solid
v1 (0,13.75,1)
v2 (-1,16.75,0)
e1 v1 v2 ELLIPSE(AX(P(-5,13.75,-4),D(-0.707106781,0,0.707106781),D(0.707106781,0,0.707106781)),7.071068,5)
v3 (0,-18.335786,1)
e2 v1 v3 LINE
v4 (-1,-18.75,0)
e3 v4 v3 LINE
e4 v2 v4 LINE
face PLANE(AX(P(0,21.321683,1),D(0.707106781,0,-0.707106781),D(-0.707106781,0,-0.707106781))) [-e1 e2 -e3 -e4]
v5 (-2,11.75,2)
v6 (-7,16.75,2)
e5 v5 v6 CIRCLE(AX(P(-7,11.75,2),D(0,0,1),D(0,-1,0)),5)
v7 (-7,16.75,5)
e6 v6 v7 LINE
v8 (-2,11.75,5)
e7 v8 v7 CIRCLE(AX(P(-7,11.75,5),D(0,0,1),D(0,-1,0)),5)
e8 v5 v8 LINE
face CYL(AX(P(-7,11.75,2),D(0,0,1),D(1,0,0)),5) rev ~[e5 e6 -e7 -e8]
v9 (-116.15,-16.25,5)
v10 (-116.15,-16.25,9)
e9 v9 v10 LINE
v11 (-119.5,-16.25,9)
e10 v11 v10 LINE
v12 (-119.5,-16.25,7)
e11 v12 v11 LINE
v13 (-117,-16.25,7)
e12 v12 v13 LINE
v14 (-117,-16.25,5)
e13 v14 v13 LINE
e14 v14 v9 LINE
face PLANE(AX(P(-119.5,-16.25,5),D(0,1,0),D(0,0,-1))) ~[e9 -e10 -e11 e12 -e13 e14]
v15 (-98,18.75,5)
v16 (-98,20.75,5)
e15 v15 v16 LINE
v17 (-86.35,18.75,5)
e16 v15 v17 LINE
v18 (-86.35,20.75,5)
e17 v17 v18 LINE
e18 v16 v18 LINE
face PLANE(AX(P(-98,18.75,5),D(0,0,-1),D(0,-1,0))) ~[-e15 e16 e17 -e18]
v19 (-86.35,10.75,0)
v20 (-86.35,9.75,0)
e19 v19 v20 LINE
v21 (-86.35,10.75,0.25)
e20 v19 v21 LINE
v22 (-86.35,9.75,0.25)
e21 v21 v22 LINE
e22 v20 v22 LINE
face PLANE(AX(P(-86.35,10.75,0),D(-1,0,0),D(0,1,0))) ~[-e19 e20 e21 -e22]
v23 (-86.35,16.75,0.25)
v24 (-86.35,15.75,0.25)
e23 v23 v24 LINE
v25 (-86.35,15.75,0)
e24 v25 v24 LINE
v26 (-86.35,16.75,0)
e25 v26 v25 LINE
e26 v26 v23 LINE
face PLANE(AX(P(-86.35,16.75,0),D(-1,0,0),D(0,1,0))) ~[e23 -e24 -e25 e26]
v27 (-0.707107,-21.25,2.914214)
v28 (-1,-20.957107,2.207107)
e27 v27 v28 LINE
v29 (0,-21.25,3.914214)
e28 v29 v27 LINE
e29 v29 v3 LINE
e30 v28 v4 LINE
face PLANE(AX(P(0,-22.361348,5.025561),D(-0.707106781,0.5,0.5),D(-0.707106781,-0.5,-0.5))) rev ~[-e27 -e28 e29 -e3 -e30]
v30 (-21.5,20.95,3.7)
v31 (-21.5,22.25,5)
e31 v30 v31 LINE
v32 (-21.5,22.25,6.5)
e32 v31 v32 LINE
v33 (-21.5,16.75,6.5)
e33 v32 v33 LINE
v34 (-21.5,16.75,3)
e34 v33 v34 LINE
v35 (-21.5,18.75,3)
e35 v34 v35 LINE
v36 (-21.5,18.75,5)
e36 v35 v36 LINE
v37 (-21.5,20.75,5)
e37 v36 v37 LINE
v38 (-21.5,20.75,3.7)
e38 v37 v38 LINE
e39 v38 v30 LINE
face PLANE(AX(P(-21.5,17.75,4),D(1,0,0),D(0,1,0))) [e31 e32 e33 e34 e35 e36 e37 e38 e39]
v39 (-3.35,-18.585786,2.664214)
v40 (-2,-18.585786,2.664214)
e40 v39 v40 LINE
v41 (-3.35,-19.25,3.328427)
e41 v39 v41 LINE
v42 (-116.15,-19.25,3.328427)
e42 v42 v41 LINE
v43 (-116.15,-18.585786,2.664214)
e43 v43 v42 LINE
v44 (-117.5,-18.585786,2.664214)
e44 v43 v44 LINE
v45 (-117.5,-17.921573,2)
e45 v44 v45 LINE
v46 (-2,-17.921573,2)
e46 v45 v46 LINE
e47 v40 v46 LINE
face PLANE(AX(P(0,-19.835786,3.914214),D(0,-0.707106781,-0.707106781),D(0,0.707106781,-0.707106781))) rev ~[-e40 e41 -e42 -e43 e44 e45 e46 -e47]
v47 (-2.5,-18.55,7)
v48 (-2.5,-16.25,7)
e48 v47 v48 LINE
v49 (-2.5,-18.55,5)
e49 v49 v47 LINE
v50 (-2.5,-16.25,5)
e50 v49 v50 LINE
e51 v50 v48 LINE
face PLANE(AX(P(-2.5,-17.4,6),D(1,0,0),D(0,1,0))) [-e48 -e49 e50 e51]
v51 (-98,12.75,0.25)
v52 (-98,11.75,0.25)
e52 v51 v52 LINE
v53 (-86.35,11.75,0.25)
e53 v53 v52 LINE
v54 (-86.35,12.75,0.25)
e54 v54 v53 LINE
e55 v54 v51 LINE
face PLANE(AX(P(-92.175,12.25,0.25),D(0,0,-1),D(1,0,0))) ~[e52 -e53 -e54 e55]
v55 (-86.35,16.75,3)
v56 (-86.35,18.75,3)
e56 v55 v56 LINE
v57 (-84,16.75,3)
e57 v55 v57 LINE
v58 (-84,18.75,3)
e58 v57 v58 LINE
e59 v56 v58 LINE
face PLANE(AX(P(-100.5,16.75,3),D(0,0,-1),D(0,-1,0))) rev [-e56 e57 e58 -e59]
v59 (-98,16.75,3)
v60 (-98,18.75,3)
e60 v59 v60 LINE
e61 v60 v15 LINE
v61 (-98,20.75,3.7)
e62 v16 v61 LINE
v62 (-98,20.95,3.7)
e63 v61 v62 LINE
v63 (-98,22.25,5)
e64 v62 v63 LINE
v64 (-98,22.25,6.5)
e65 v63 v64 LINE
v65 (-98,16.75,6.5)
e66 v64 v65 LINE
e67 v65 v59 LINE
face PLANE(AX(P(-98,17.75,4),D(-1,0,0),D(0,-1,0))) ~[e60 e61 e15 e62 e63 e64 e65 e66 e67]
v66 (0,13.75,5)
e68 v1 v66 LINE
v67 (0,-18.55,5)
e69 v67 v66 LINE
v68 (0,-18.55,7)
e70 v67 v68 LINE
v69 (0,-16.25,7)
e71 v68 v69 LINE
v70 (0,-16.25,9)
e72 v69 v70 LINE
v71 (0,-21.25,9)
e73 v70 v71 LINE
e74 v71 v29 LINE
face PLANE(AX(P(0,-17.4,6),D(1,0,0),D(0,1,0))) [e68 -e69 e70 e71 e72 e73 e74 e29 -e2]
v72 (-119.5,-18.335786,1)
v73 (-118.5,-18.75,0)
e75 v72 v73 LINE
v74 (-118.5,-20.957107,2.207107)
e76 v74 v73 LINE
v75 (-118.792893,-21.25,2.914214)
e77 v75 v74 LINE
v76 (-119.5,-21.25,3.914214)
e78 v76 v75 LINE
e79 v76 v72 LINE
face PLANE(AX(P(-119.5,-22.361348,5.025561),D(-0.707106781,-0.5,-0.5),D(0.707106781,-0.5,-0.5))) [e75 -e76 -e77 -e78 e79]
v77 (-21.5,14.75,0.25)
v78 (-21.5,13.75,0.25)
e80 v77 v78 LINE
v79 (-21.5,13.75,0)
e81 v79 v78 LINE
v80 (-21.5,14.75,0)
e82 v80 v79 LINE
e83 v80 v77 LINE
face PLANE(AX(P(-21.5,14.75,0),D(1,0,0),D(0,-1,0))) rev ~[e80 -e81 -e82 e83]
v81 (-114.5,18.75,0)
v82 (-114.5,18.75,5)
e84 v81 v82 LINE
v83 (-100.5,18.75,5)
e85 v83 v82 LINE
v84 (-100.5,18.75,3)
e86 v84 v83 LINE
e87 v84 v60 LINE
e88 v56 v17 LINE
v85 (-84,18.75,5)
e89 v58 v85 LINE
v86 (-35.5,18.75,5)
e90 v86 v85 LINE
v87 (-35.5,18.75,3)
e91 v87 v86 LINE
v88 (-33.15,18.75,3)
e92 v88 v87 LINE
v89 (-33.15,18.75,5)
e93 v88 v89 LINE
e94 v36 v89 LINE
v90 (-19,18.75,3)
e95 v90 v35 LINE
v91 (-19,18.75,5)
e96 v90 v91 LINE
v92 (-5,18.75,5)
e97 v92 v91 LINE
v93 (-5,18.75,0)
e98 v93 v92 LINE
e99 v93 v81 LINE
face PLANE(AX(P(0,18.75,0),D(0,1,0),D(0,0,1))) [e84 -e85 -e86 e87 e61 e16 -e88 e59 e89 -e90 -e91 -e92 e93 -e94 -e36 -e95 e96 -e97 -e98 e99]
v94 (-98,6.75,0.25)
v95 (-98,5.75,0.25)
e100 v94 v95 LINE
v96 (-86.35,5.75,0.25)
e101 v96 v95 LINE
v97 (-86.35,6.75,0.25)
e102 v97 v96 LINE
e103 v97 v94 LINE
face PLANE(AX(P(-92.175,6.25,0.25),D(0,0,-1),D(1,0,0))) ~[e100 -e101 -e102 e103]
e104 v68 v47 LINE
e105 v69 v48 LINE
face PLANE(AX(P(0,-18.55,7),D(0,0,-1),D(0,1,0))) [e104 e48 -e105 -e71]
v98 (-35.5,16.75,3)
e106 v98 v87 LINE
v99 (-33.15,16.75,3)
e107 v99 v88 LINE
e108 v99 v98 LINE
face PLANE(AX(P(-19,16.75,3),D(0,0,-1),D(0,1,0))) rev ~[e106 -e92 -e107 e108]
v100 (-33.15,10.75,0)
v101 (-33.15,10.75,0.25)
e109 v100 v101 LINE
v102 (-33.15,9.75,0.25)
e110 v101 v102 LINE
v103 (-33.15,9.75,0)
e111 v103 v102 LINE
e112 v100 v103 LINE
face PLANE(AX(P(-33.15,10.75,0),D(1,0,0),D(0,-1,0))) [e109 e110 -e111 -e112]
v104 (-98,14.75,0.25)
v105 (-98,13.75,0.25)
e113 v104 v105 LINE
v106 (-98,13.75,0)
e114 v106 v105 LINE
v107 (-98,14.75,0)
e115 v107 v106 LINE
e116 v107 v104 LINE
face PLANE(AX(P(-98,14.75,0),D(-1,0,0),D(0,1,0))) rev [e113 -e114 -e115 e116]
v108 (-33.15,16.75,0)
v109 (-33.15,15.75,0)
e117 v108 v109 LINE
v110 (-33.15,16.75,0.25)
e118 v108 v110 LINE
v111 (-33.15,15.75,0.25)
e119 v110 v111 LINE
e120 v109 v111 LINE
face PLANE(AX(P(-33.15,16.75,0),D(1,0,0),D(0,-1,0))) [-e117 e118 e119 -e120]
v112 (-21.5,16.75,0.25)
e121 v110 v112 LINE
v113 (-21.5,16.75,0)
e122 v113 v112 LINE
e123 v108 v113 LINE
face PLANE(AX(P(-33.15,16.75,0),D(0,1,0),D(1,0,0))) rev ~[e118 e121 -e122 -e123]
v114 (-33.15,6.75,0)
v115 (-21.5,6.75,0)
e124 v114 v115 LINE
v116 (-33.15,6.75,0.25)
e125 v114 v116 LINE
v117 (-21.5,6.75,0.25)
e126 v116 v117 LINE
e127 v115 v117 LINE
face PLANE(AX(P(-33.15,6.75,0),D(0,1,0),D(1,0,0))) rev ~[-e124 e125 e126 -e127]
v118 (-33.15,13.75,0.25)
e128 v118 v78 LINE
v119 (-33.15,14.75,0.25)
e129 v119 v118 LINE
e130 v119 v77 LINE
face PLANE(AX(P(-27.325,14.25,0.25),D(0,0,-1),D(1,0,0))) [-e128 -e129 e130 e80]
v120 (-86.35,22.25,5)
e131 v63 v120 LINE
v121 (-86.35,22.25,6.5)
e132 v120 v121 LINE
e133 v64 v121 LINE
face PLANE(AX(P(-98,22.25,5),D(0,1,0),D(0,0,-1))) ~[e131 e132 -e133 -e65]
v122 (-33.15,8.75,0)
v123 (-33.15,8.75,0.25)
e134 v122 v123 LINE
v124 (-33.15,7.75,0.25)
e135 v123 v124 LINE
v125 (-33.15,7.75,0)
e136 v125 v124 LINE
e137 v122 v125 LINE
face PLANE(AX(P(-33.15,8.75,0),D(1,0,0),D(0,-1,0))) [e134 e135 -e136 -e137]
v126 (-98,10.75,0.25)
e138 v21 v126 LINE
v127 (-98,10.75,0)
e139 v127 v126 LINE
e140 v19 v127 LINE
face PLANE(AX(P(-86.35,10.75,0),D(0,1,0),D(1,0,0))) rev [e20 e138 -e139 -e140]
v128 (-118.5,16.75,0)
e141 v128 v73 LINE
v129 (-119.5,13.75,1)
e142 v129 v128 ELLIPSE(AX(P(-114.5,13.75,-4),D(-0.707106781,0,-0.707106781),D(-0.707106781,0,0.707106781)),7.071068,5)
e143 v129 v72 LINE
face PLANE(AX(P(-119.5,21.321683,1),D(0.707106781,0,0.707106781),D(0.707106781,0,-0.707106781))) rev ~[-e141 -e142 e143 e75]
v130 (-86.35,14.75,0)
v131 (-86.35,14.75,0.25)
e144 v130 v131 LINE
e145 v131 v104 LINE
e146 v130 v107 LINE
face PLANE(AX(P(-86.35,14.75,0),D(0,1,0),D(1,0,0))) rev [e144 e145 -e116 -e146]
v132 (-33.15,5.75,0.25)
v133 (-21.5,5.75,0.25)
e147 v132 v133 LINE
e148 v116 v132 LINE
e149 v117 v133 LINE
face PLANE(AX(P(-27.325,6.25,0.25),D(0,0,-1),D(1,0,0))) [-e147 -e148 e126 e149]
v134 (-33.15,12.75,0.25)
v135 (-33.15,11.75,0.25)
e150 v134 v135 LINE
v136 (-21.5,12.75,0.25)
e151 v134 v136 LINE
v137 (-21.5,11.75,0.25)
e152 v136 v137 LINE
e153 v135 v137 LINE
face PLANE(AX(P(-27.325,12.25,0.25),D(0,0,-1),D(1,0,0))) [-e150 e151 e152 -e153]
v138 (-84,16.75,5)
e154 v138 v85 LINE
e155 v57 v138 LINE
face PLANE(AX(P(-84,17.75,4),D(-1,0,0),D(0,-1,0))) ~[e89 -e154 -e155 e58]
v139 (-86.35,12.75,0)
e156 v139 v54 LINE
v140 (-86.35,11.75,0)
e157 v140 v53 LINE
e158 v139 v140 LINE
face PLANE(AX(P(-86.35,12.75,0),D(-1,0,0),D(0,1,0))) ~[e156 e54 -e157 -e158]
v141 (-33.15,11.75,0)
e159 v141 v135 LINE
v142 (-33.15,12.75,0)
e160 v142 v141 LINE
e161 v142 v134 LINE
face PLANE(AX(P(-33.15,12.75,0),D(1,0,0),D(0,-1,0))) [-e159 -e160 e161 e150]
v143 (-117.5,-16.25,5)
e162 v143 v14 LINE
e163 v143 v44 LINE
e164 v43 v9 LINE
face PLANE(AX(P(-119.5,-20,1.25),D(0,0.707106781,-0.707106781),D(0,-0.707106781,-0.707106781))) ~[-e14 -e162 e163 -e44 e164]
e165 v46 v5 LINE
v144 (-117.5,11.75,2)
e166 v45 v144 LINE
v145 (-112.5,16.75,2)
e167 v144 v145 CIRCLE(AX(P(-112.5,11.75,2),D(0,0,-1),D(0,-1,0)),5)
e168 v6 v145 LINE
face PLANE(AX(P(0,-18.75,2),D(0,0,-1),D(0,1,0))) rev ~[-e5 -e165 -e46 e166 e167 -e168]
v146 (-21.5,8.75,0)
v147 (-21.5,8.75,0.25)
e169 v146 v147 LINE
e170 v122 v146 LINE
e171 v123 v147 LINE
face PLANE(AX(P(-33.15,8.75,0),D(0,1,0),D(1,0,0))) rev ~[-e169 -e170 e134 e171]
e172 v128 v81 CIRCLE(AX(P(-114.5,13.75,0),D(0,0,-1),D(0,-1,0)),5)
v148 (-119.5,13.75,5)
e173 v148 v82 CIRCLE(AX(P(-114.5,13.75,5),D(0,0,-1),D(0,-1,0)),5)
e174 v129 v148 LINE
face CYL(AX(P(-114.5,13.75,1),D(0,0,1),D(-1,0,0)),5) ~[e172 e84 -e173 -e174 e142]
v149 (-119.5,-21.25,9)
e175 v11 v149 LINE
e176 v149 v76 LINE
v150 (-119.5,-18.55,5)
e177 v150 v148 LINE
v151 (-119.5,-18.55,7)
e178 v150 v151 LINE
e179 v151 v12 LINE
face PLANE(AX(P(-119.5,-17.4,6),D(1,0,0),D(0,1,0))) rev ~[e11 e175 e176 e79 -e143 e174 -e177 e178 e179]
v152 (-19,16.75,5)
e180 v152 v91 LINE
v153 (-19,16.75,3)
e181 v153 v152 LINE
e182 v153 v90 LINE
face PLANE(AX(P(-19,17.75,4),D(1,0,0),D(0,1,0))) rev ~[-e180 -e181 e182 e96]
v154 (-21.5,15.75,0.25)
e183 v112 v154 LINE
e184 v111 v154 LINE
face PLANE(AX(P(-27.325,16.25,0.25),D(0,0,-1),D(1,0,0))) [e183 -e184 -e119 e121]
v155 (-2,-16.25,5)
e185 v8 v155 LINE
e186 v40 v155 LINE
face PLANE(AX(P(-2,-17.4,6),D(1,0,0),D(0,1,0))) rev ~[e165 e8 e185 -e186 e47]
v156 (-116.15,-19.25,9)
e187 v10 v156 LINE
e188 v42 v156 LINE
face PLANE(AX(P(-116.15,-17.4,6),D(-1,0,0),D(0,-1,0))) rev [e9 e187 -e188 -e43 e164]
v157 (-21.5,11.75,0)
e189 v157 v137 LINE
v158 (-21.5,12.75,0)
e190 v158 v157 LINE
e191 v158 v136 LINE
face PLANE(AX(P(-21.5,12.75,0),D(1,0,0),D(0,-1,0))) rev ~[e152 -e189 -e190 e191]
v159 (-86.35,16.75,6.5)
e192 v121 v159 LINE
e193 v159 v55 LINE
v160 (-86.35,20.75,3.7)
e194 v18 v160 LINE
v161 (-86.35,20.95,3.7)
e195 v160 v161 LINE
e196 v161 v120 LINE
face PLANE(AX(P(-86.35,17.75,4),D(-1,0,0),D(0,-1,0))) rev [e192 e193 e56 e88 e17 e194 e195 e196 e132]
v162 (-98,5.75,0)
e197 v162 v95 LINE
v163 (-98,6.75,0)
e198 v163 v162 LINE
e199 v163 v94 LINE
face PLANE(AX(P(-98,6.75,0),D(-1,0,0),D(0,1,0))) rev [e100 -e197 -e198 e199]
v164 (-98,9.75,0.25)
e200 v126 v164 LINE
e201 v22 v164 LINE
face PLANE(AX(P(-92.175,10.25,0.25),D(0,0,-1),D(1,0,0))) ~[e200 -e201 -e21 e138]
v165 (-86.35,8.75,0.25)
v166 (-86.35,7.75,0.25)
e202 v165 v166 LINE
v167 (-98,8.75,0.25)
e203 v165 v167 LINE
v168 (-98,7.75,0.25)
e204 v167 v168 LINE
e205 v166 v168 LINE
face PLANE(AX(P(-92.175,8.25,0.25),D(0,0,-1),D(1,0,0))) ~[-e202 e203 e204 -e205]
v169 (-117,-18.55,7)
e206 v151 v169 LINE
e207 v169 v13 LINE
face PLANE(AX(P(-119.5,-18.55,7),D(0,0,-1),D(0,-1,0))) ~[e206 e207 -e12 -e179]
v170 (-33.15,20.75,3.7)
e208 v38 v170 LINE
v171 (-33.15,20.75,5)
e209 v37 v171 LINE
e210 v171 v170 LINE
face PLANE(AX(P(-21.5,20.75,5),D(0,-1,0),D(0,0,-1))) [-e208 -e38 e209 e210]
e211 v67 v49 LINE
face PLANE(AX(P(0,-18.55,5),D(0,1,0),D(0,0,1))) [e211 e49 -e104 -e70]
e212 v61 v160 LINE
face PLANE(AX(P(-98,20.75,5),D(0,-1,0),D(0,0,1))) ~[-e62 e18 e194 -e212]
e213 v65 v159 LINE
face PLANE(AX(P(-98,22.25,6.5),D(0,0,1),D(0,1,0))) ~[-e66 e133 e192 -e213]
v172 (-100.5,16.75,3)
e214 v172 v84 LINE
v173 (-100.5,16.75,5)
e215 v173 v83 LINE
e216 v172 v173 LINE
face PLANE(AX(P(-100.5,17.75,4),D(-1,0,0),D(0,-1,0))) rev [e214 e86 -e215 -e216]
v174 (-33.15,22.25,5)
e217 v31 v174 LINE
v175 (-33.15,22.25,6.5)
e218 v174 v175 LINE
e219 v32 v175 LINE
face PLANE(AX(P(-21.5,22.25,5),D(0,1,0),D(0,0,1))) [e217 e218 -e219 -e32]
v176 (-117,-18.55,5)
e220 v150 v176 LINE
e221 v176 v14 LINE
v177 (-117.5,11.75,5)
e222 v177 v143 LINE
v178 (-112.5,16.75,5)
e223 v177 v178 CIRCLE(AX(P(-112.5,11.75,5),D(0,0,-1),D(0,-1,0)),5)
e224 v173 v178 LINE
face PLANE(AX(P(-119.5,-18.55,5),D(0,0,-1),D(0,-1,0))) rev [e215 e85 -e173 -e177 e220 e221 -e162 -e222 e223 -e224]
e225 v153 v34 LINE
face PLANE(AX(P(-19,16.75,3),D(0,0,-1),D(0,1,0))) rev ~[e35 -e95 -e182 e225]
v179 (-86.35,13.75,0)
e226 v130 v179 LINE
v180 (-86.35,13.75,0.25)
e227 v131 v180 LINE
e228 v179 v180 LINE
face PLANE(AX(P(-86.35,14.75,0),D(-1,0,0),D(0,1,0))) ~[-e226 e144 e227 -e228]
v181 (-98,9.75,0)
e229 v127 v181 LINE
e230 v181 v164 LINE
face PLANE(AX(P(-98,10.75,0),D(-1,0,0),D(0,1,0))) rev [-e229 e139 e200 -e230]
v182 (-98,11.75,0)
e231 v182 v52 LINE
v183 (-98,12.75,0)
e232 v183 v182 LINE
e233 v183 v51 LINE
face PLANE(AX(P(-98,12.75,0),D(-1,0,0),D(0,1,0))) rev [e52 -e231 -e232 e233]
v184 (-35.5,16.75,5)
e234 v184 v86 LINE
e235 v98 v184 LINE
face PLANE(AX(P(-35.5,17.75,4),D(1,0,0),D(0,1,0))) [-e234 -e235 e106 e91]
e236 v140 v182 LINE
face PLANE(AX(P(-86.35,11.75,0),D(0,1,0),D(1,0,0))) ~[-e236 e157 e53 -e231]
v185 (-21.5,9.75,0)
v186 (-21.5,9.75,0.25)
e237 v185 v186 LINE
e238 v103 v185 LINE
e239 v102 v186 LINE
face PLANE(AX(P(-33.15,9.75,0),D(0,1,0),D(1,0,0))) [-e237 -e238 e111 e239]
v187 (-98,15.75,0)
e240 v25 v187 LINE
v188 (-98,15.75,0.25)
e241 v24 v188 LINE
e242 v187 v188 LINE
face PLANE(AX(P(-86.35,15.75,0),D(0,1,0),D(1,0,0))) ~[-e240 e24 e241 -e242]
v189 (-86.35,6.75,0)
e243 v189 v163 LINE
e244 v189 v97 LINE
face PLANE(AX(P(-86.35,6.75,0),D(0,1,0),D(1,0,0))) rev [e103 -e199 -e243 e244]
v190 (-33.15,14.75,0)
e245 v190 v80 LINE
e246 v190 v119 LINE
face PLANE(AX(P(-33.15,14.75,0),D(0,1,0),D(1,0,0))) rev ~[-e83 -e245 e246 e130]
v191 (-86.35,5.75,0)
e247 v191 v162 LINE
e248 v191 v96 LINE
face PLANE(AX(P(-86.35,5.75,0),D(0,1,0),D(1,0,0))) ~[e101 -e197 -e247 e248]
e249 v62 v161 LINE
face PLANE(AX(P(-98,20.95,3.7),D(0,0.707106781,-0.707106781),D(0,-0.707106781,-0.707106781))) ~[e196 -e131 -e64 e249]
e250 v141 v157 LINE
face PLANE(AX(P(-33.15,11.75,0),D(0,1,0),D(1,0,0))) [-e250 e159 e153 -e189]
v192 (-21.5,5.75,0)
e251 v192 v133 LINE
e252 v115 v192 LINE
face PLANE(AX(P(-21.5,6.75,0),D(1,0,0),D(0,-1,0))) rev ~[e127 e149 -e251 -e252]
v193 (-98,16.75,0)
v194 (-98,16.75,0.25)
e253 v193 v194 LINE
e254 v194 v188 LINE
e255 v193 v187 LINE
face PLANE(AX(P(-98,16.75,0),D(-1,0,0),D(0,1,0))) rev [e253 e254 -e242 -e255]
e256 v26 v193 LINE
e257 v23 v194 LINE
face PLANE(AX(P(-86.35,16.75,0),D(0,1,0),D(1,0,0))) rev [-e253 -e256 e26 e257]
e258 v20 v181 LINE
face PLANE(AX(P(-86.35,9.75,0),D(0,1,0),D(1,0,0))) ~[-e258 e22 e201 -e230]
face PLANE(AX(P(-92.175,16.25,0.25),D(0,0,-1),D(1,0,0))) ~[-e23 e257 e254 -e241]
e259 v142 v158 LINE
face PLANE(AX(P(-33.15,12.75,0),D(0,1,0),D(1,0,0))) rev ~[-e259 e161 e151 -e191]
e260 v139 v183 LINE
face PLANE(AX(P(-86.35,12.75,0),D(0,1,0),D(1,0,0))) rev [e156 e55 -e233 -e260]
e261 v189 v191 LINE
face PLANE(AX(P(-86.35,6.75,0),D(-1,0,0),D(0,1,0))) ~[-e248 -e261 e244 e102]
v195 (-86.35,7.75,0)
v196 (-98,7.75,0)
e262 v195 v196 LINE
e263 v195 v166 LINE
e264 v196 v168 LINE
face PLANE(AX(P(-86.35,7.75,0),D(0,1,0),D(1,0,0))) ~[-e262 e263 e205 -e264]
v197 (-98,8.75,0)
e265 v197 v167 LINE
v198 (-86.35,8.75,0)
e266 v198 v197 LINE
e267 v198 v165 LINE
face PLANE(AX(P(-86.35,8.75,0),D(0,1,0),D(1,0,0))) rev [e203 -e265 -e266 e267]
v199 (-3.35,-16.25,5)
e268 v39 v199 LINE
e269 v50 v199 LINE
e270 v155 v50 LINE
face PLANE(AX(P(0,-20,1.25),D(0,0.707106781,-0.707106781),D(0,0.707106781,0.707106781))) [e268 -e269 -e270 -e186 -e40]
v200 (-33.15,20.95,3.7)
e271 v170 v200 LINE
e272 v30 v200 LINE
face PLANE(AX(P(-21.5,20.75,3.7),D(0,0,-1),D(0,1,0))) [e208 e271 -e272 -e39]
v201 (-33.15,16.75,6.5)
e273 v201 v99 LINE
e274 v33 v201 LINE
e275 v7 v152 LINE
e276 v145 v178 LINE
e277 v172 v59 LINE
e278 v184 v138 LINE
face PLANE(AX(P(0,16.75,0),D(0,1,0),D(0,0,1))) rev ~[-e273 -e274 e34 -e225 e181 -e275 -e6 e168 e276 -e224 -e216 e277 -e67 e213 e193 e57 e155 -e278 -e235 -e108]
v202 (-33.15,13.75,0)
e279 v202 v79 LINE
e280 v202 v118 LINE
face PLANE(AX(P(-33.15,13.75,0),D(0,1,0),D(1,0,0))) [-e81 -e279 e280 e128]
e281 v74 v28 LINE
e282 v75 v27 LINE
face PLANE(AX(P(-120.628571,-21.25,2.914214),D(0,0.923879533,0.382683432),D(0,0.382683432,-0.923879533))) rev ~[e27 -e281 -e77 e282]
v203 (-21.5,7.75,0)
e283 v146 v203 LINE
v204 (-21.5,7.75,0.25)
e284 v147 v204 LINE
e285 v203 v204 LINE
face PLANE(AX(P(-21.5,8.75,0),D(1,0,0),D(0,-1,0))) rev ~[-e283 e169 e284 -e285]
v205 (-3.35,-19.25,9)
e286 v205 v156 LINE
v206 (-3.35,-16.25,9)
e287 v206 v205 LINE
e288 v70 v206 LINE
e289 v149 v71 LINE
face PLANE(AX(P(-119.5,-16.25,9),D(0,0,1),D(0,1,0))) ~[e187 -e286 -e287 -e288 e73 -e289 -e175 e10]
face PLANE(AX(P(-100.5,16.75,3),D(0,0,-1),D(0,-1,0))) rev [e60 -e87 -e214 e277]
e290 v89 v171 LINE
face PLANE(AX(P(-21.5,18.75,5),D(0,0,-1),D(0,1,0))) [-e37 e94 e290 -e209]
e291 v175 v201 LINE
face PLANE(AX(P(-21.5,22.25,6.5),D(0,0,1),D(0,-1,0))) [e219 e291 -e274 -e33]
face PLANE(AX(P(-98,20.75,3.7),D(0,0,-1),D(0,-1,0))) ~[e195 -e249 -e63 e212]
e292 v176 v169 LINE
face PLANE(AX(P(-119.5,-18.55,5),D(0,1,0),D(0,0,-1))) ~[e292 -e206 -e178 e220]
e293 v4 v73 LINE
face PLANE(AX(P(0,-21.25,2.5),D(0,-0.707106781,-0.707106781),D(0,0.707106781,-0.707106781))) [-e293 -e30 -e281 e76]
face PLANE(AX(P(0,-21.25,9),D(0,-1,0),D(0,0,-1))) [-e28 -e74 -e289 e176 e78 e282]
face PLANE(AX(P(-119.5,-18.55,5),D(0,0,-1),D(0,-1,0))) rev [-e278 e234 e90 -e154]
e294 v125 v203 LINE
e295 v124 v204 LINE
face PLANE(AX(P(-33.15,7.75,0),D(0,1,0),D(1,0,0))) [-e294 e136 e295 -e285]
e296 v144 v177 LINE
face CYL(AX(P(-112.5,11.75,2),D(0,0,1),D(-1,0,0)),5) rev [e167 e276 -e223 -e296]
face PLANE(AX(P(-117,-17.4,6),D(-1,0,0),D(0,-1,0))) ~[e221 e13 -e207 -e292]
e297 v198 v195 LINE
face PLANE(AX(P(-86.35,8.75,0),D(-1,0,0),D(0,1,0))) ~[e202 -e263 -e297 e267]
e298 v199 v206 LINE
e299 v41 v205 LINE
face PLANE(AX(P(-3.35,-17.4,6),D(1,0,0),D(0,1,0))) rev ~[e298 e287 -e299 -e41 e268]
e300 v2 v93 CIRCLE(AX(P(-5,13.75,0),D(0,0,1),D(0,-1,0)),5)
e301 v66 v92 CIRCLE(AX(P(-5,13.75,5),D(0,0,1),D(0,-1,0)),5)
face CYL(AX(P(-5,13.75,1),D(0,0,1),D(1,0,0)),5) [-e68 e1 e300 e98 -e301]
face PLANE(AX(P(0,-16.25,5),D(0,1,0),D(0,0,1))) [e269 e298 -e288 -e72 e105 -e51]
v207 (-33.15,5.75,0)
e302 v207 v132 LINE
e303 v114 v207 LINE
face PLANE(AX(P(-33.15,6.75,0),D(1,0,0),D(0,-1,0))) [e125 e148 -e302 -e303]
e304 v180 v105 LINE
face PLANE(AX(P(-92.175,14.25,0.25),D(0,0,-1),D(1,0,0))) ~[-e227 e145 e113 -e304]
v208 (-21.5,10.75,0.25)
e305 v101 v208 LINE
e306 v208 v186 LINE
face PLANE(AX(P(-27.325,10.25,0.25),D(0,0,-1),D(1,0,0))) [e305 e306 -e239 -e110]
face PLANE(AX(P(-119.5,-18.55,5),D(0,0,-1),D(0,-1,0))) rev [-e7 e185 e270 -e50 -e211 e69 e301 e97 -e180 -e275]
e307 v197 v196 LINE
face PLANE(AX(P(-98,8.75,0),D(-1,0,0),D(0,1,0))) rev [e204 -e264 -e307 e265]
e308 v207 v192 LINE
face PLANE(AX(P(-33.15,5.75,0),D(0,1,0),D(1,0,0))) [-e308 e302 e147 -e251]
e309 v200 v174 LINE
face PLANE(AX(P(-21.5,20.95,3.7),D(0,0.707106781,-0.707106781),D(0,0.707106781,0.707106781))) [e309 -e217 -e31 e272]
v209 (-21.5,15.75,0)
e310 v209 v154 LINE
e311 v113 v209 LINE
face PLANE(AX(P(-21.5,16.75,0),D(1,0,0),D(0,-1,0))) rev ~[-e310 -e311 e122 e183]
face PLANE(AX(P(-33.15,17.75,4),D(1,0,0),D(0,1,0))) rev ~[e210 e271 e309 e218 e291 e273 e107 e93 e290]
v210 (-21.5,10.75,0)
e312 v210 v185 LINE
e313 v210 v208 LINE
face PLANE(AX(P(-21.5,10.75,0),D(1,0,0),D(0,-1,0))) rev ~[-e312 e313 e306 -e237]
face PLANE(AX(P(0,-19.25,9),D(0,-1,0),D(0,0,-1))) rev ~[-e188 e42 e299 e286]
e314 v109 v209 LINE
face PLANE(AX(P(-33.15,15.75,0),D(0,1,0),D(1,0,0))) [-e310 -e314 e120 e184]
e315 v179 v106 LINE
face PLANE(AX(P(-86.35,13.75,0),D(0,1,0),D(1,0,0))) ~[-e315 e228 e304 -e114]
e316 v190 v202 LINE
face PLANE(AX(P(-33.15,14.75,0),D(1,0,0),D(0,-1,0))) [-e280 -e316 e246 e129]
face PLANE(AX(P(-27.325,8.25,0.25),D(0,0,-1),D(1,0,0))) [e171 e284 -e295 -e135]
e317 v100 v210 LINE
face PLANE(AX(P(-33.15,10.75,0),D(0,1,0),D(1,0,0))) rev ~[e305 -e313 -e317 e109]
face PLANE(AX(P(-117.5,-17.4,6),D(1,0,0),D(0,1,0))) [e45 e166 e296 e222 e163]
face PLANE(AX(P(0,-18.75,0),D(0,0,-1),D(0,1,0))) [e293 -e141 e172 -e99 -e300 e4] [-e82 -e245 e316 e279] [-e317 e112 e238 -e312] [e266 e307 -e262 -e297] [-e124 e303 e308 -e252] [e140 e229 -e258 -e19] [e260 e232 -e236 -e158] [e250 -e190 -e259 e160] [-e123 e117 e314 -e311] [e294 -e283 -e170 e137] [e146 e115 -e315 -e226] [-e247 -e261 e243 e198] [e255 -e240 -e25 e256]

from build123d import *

# Parameters (mm, degrees)
F0_W         = 2.3
F0_H         = 2
F0_W_2       = 2
F1_DEPTH     = 119.5
F2_T         = -2
F3_DEPTH     = 3.35
F4_DEPTH     = 2.5
F5_START     = -19
F5_DEPTH     = 16.5
F6_START     = -21.5
F6_DEPTH     = 11.65
F8_W         = 11.65
F8_H         = 1
F9_DEPTH     = 0.25
F10_T1_DEPTH = 42.6433659759
F10_T3_DEPTH = 8.6788998819
F10_T5_DEPTH = 121.7571417204
F11_R        = 5


# Not quite as in the source:
# - a fillet or chamfer that OpenCascade refuses, or shapes differently, is made with other operations: its cross-section is extruded or revolved along the edge and cut away or added
# - a pattern or mirror of a feature is missing from the dataset's text; its kind, count and spacing are read off the source's solid


with BuildPart() as f1:
    # F0 (on Right) → F1 (new body)
    with BuildSketch(Plane.YZ):
        with Locations((-17.4, 6)):
            Rectangle(F0_W, F0_H)
        Polygon((-21.25, 2.5), (-20, 1.25), (-16.25, 5), (-18.55, 5), (-18.55, 7), (-16.25, 7), (-16.25, 9), (-21.25, 9), align=None)
        Polygon((-18.75, 0), (18.75, 0), (18.75, 3), (16.75, 3), (16.75, 5), (-16.25, 5), (-20, 1.25), align=None)
        with Locations((17.75, 4)):
            Rectangle(F0_W_2, F0_H)
    extrude(amount=-F1_DEPTH)

    # F2
    f2_openings = [f1.faces().sort_by_distance(p)[0] for p in [
        (-59.75, 1.25, 5),
        (-59.75, -16.25, 7),
        (-59.75, -18.75, 9),
    ]]
    offset(amount=F2_T, openings=f2_openings)

    # F0 (on Right) → F3 (join)
    with BuildSketch(Plane.YZ):
        with Locations((-17.4, 6)):
            Rectangle(F0_W, F0_H)
        Polygon((-21.25, 2.5), (-20, 1.25), (-16.25, 5), (-18.55, 5), (-18.55, 7), (-16.25, 7), (-16.25, 9), (-21.25, 9), align=None)
    f3 = extrude(amount=-F3_DEPTH)

    # F3_copies: F3 across plane
    add(f3.mirror(Plane(origin=(-59.75, 0, 0), x_dir=(0, 0, -1), z_dir=(-1, 0, 0))))

    # F0 (on Right) → F4 (cut)
    with BuildSketch(Plane.YZ):
        with Locations((-17.4, 6)):
            Rectangle(F0_W, F0_H)
    f4 = extrude(amount=-F4_DEPTH, mode=Mode.SUBTRACT)

    # F4_copies: F4 across plane
    add(f4.mirror(Plane(origin=(-59.75, 0, 0), x_dir=(0, 0, -1), z_dir=(-1, 0, 0))), mode=Mode.SUBTRACT)

    # F0 (on Right) → F5 (cut)
    with BuildSketch(Plane.YZ.offset(F5_START)):
        with Locations((17.75, 4)):
            Rectangle(F0_W_2, F0_H)
    f5 = extrude(amount=-F5_DEPTH, mode=Mode.SUBTRACT)

    # F5_copies: F5 across plane
    add(f5.mirror(Plane(origin=(-59.75, 0, 0), x_dir=(0, 0, -1), z_dir=(-1, 0, 0))), mode=Mode.SUBTRACT)

    # F0 (on Right) → F6 (join)
    with BuildSketch(Plane.YZ.offset(F6_START)):
        with Locations((17.75, 4)):
            Rectangle(F0_W_2, F0_H)
        Polygon((16.75, 5), (18.75, 5), (20.75, 5), (20.75, 3.7), (20.95, 3.7), (22.25, 5), (22.25, 6.5), (16.75, 6.5), align=None)
    f6 = extrude(amount=-F6_DEPTH)

    # F6_copies: F6 across plane
    add(f6.mirror(Plane(origin=(-59.75, 0, 0), x_dir=(0, 0, -1), z_dir=(-1, 0, 0))))

    # F8 (on face) → F9 (cut)
    with BuildSketch(Plane(origin=(0, 0, 0), x_dir=(1, 0, 0), z_dir=(0, 0, -1))):
        with Locations((-27.325, -16.25)):
            Rectangle(F8_W, F8_H)
        with Locations((-27.325, -14.25)):
            Rectangle(F8_W, F8_H)
        with Locations((-27.325, -12.25)):
            Rectangle(F8_W, F8_H)
        with Locations((-27.325, -10.25)):
            Rectangle(F8_W, F8_H)
        with Locations((-27.325, -8.25)):
            Rectangle(F8_W, F8_H)
        with Locations((-27.325, -6.25)):
            Rectangle(F8_W, F8_H)
    f9 = extrude(amount=-F9_DEPTH, mode=Mode.SUBTRACT)

    # F9_copies: F9 across plane
    add(f9.mirror(Plane(origin=(-59.75, 0, 0), x_dir=(0, 0, -1), z_dir=(-1, 0, 0))), mode=Mode.SUBTRACT)

    # F10: chamfer of 1 on 5 edges, made by hand

    # F10_s2 → F10_t1 (cut)
    with BuildSketch(Plane.XZ.offset(-21.321682988)):
        Polygon((0, 1), (-1, 0), (0, 0), align=None)
        Polygon((-119.5, 1), (-118.5, 0), (-119.5, 0), align=None)
    extrude(amount=F10_T1_DEPTH, mode=Mode.SUBTRACT)

    # F10_s4 → F10_t3 (cut)
    with BuildSketch(Plane(origin=(0, -13.6934544799, 13.6934544799), x_dir=(1, 0, 0), z_dir=(0, 0.7071067812, -0.7071067812))):
        Polygon((0, 12.2582521472), (-1, 13.2582521472), (0, 13.2582521472), align=None)
        Polygon((-119.5, 12.2582521472), (-118.5, 13.2582521472), (-119.5, 13.2582521472), align=None)
    extrude(amount=F10_T3_DEPTH, mode=Mode.SUBTRACT)

    # F10_s6 → F10_t5 (cut)
    with BuildSketch(Plane.YZ.offset(-120.6285708602)):
        Polygon((-21.25, 2.9142135624), (-20.9571067812, 2.2071067812), (-21.25, 2.5), align=None)
    extrude(amount=F10_T5_DEPTH, mode=Mode.SUBTRACT)

    # F11
    f11_edges = [f1.edges().sort_by_distance(p)[0] for p in [
        (0, 18.75, 3),
        (-119.5, 18.75, 3),
        (-2, 16.75, 3.5),
        (-117.5, 16.75, 3.5),
    ]]
    fillet(f11_edges, radius=F11_R)


solid = f1.part
